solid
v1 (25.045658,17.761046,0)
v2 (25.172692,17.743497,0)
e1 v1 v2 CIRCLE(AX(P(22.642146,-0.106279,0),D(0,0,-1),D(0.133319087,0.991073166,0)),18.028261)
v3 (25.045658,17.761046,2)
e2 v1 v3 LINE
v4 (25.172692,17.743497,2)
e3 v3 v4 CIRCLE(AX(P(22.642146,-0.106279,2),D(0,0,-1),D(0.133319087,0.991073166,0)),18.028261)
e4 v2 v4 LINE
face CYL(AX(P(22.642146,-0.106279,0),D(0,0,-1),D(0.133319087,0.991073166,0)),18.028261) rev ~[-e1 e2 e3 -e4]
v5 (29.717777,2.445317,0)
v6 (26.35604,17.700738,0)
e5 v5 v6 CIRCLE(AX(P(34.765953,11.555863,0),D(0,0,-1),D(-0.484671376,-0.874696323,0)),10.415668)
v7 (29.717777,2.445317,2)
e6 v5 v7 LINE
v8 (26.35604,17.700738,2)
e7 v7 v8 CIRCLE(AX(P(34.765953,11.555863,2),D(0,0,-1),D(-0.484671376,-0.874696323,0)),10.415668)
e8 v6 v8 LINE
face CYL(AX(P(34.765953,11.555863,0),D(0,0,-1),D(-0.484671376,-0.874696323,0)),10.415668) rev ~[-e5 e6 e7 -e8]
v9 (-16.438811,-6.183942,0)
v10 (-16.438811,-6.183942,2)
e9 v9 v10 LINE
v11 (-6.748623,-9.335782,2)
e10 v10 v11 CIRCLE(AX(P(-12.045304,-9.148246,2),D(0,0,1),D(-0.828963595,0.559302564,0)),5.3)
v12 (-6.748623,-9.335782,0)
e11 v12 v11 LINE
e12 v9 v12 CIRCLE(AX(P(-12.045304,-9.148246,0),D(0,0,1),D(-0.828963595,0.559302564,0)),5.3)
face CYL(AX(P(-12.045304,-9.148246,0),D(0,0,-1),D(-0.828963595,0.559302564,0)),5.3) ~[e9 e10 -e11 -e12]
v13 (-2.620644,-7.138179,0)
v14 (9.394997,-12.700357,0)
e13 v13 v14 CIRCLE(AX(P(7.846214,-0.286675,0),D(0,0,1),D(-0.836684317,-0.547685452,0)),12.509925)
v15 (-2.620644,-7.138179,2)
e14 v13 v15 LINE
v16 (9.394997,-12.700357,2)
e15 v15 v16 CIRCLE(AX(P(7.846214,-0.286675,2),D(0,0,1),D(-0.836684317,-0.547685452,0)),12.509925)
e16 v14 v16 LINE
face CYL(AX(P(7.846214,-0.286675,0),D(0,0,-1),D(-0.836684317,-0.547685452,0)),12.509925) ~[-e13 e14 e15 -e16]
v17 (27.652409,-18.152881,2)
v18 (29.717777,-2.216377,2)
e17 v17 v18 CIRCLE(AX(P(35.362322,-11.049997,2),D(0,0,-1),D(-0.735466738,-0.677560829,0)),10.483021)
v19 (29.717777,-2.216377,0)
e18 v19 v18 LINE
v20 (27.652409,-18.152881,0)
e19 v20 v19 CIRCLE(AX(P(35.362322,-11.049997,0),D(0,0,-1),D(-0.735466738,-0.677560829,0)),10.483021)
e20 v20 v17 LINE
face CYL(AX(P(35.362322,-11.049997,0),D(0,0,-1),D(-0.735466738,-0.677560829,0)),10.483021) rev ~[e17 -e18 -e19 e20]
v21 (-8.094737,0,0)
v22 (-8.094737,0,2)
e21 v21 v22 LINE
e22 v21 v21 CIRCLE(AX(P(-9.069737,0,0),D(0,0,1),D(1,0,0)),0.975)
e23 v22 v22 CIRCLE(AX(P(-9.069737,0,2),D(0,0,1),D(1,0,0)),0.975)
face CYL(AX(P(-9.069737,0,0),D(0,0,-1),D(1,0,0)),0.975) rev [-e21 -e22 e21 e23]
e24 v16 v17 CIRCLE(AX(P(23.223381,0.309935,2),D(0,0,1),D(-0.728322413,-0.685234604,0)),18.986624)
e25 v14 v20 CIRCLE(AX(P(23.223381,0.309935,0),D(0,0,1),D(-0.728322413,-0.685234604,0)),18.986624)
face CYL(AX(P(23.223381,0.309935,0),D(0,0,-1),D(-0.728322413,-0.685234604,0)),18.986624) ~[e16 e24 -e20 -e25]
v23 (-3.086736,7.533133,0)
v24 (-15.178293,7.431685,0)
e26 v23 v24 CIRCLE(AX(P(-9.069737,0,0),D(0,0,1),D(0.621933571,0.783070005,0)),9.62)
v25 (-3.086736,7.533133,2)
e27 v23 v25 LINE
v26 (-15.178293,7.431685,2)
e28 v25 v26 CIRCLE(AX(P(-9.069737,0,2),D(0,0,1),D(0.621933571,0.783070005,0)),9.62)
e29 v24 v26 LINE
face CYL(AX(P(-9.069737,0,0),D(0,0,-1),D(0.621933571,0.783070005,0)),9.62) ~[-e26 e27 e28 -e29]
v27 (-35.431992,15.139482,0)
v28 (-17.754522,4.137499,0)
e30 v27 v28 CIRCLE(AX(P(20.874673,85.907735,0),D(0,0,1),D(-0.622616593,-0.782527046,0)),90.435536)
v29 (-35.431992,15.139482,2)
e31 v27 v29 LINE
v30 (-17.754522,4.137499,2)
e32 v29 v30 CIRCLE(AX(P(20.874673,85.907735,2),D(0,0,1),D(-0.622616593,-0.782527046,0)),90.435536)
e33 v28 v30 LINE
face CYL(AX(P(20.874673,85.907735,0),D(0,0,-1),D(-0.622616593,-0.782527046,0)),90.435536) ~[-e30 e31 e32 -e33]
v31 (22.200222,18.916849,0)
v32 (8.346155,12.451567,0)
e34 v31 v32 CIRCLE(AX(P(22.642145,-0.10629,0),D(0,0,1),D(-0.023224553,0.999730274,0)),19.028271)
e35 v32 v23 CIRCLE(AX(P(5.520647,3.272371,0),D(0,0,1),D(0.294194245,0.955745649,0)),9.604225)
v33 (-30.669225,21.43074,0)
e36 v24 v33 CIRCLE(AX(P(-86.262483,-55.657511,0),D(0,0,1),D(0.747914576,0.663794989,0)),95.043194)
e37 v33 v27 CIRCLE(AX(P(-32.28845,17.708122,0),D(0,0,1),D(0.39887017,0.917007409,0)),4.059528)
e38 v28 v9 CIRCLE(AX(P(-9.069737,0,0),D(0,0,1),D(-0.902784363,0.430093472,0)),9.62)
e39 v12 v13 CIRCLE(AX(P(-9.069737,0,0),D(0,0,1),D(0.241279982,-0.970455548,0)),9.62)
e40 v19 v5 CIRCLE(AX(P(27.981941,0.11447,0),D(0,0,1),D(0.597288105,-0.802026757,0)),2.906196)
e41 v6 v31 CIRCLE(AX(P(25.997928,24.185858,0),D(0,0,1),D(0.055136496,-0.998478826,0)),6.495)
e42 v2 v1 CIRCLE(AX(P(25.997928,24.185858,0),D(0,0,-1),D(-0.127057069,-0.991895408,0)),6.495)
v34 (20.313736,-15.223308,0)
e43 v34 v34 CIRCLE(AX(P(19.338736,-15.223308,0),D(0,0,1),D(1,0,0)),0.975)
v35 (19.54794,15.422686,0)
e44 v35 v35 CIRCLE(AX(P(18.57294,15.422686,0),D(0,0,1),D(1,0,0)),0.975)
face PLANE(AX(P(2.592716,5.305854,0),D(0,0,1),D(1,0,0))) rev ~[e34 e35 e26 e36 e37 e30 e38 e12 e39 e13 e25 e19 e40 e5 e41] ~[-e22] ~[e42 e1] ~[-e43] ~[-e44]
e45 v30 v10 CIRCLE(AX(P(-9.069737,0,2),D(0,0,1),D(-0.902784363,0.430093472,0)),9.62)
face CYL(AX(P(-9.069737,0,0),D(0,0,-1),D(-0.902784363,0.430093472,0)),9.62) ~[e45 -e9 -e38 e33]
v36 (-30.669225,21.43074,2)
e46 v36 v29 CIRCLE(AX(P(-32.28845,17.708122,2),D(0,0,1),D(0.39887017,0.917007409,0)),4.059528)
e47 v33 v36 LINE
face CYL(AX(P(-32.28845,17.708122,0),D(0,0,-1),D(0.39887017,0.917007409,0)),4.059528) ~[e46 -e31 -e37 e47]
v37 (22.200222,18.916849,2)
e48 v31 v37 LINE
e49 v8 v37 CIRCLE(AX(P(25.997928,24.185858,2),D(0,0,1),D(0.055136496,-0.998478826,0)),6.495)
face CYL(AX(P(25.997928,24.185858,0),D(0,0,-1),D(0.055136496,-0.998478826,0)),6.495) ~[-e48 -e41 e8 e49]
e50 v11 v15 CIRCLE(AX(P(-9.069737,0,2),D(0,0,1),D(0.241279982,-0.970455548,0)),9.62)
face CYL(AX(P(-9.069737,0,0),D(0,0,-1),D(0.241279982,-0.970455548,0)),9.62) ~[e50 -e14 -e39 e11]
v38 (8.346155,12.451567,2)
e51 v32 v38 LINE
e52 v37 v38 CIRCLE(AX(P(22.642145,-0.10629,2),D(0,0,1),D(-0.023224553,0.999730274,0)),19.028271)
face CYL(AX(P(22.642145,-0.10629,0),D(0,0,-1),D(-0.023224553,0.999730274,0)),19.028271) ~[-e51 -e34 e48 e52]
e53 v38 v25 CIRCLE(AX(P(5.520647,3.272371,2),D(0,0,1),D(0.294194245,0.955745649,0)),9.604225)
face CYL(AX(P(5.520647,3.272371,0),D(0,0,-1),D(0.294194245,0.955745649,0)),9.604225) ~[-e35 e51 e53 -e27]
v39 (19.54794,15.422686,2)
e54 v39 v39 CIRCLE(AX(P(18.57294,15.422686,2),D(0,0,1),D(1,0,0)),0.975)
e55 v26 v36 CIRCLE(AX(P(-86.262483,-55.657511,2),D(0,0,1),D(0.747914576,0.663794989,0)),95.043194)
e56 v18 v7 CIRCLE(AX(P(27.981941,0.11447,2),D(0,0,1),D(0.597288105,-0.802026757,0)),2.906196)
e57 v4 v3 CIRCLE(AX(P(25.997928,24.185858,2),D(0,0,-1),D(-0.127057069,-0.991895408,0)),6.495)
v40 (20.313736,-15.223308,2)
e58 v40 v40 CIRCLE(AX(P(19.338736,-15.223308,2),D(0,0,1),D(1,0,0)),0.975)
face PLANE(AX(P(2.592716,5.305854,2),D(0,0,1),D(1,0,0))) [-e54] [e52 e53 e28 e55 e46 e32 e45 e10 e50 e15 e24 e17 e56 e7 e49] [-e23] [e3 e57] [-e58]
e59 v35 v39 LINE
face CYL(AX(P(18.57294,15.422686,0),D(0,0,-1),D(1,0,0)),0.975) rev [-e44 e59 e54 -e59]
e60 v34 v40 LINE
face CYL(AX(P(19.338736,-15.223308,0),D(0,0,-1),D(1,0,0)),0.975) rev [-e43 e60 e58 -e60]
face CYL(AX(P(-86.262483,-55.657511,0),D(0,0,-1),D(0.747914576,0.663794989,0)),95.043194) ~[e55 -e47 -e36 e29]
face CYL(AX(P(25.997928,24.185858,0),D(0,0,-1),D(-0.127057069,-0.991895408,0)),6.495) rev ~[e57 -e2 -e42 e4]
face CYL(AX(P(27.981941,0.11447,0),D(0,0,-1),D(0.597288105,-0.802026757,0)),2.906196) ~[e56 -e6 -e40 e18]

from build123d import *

# Parameters (mm, degrees)
F1_R     = 0.975
F1_R_2   = 5.495
F2_DEPTH = 2


# Not quite as in the source:
# - the program builds the solid bodies; features that only make, move or delete a surface that nothing else refers to are left out


with BuildPart() as f2:
    # F1 (on Top) → F2 (new body)
    with BuildSketch(Plane.XY):
        with BuildLine():
            ThreePointArc((8.3461548541, 12.451567302), (1.7252198574, 12.0948349613), (-3.0867358283, 7.5331334509))
            ThreePointArc((-3.0867358283, 7.5331334509), (-9.1504459177, 9.6196614304), (-15.1782928372, 7.431685066))
            ThreePointArc((-15.1782928372, 7.431685066), (-22.5381757879, 14.8578874844), (-30.6692253798, 21.4307401329))
            ThreePointArc((-30.6692253798, 21.4307401329), (-35.5250947404, 20.1584087851), (-35.4319922626, 15.1394819841))
            ThreePointArc((-35.4319922626, 15.1394819841), (-26.9109452732, 9.1280444677), (-17.7545223506, 4.1374991998))
            ThreePointArc((-17.7545223506, 4.1374991998), (-18.6125164693, -1.2164521529), (-16.4388114376, -6.1839420049))
            ThreePointArc((-16.4388114376, -6.1839420049), (-13.6846503599, -14.1883393203), (-6.7486233515, -9.3357823691))
            ThreePointArc((-6.7486233515, -9.3357823691), (-4.5490625181, -8.4916373097), (-2.6206436977, -7.1381789267))
            ThreePointArc((-2.6206436977, -7.1381789267), (2.5909813664, -11.6392406956), (9.3949967995, -12.7003565431))
            ThreePointArc((9.3949967995, -12.7003565431), (17.7901975829, -17.882711986), (27.6524089277, -18.1528814137))
            ThreePointArc((27.6524089277, -18.1528814137), (24.9662444476, -9.7026669711), (29.7177772104, -2.2163768254))
            ThreePointArc((29.7177772104, -2.2163768254), (30.8881367766, 0.1144698658), (29.7177772104, 2.4453165571))
            ThreePointArc((29.7177772104, 2.4453165571), (24.594325339, 9.3144076758), (26.3560396261, 17.700737901))
            ThreePointArc((26.3560396261, 17.700737901), (27.8220537541, 30.4194435664), (22.2002219007, 18.9168491704))
            ThreePointArc((22.2002219007, 18.9168491704), (14.5953140013, 17.1367848208), (8.3461548541, 12.451567302))
        make_face()
        with BuildLine():
            Line((-17.6755707347, -0.4939858073), (-12.0034380316, -0.4939858073))
            ThreePointArc((-12.0034380316, -0.4939858073), (-10.5336675739, -2.589890275), (-7.9799964747, -2.7682288675))
            Line((-7.9799964747, -2.7682288675), (-5.2005199999, -7.702828149))
            ThreePointArc((-5.2005199999, -7.702828149), (-5.9901385216, -8.0511163546), (-6.810625891, -8.3187029026))
            ThreePointArc((-6.810625891, -8.3187029026), (-7.2968984625, -8.4404428952), (-7.7895048721, -8.5332898913))
            ThreePointArc((-7.7895048721, -8.5332898913), (-13.3753397984, -13.2373782399), (-15.1250045058, -6.1473378715))
            ThreePointArc((-15.1250045058, -6.1473378715), (-15.4687321672, -5.7824640106), (-15.7903406401, -5.3979518136))
            ThreePointArc((-15.7903406401, -5.3979518136), (-17.1156764189, -3.0930980197), (-17.6755707347, -0.4939858073))
        make_face(mode=Mode.SUBTRACT)
        with Locations((-9.069736782, 0)):
            Circle(F1_R, mode=Mode.SUBTRACT)
        with Locations((19.3387361329, -15.2233078331)):
            Circle(F1_R, mode=Mode.SUBTRACT)
        with BuildLine():
            ThreePointArc((20.3872606575, 17.7804109262), (22.7170872685, 17.9218257414), (25.0456576674, 17.7610461256))
            ThreePointArc((25.0456576674, 17.7610461256), (25.1091906486, 17.7523846185), (25.172692422, 17.7434972003))
            ThreePointArc((25.172692422, 17.7434972003), (23.684740061, 8.8128379715), (29.166954709, 1.6075621931))
            ThreePointArc((29.166954709, 1.6075621931), (29.8880875558, 0.1007714549), (29.1453733807, -1.3954994316))
            ThreePointArc((29.1453733807, -1.3954994316), (24.1127403048, -8.7463736841), (25.8509191741, -17.4837349662))
            ThreePointArc((25.8509191741, -17.4837349662), (23.5178476173, -17.6742786032), (21.1797885868, -17.5602183711))
            ThreePointArc((21.1797885868, -17.5602183711), (20.0605128424, -12.3371922115), (16.6143622853, -16.4184698048))
            ThreePointArc((16.6143622853, -16.4184698048), (12.9131993659, -14.4284100321), (9.7748074556, -11.6338723113))
            ThreePointArc((9.7748074556, -11.6338723113), (2.6662624957, -10.5651214915), (-2.4218244994, -5.4872271944))
            ThreePointArc((-2.4218244994, -5.4872271944), (-3.341520275, -6.4414234179), (-4.3966137229, -7.2433639198))
            Line((-4.3966137229, -7.2433639198), (-7.1815796443, -2.2990188393))
            ThreePointArc((-7.1815796443, -2.2990188393), (-6.094920293, 0.0330432552), (-7.2331126554, 2.3403924495))
            Line((-7.2331126554, 2.3403924495), (-4.4863168152, 7.3004562466))
            ThreePointArc((-4.4863168152, 7.3004562466), (-3.5431905745, 6.6152616741), (-2.7011412367, 5.8090783073))
            ThreePointArc((-2.7011412367, 5.8090783073), (1.7884096787, 11.0249893996), (8.6656284498, 11.2812274136))
            ThreePointArc((8.6656284498, 11.2812274136), (11.9172089396, 14.3848906615), (15.8355289242, 16.5876774731))
            ThreePointArc((15.8355289242, 16.5876774731), (19.3270471679, 12.5448488398), (20.3872606575, 17.7804109262))
        make_face(mode=Mode.SUBTRACT)
        with BuildLine():
            ThreePointArc((-16.3638620166, 4.5934885503), (-26.0025688441, 9.741867589), (-34.9414590553, 16.0273045526))
            ThreePointArc((-34.9414590553, 16.0273045526), (-34.7398034138, 19.6908643856), (-31.1758954498, 20.5631577259))
            ThreePointArc((-31.1758954498, 20.5631577259), (-22.796689347, 13.7414479433), (-15.2552633126, 6.0036373591))
            ThreePointArc((-15.2552633126, 6.0036373591), (-10.598818784, 8.4832958354), (-5.3696469446, 7.7854823354))
            Line((-5.3696469446, 7.7854823354), (-8.119843394, 2.8192778422))
            ThreePointArc((-8.119843394, 2.8192778422), (-10.5540740424, 2.5782489983), (-11.9848002521, 0.5941632478))
            Line((-11.9848002521, 0.5941632478), (-17.6692350252, 0.5941632478))
            ThreePointArc((-17.6692350252, 0.5941632478), (-17.2642756667, 2.67468362), (-16.3638620166, 4.5934885503))
        make_face(mode=Mode.SUBTRACT)
        with Locations((18.5729401514, 15.4226861541)):
            Circle(F1_R, mode=Mode.SUBTRACT)
        with Locations((25.9979280814, 24.1858578784)):
            Circle(F1_R_2, mode=Mode.SUBTRACT)
        with BuildLine():
            ThreePointArc((25.172692422, 17.7434972003), (25.1091317315, 17.7519581241), (25.0456576674, 17.7610461256))
            ThreePointArc((25.0456576674, 17.7610461256), (22.7170872685, 17.9218257414), (20.3872606575, 17.7804109262))
            ThreePointArc((20.3872606575, 17.7804109262), (19.3270471679, 12.5448488398), (15.8355289242, 16.5876774731))
            ThreePointArc((15.8355289242, 16.5876774731), (11.9172089396, 14.3848906615), (8.6656284498, 11.2812274136))
            ThreePointArc((8.6656284498, 11.2812274136), (1.7884096787, 11.0249893996), (-2.7011412367, 5.8090783073))
            ThreePointArc((-2.7011412367, 5.8090783073), (-3.5431905745, 6.6152616741), (-4.4863168152, 7.3004562466))
            Line((-4.4863168152, 7.3004562466), (-7.2331126554, 2.3403924495))
            ThreePointArc((-7.2331126554, 2.3403924495), (-6.094920293, 0.0330432552), (-7.1815796443, -2.2990188393))
            Line((-7.1815796443, -2.2990188393), (-4.3966137229, -7.2433639198))
            ThreePointArc((-4.3966137229, -7.2433639198), (-3.341520275, -6.4414234179), (-2.4218244994, -5.4872271944))
            ThreePointArc((-2.4218244994, -5.4872271944), (2.6662624957, -10.5651214915), (9.7748074556, -11.6338723113))
            ThreePointArc((9.7748074556, -11.6338723113), (12.9131993659, -14.4284100321), (16.6143622853, -16.4184698048))
            ThreePointArc((16.6143622853, -16.4184698048), (20.0605128424, -12.3371922115), (21.1797885868, -17.5602183711))
            ThreePointArc((21.1797885868, -17.5602183711), (23.5178476173, -17.6742786032), (25.8509191741, -17.4837349662))
            ThreePointArc((25.8509191741, -17.4837349662), (24.1127403048, -8.7463736841), (29.1453733807, -1.3954994316))
            ThreePointArc((29.1453733807, -1.3954994316), (29.8880875558, 0.1007714549), (29.166954709, 1.6075621931))
            ThreePointArc((29.166954709, 1.6075621931), (23.684740061, 8.8128379715), (25.172692422, 17.7434972003))
        make_face()
        with BuildLine():
            ThreePointArc((-31.1758954498, 20.5631577259), (-34.7398034138, 19.6908643856), (-34.9414590553, 16.0273045526))
            ThreePointArc((-34.9414590553, 16.0273045526), (-26.0025688441, 9.741867589), (-16.3638620166, 4.5934885503))
            ThreePointArc((-16.3638620166, 4.5934885503), (-17.2642756667, 2.67468362), (-17.6692350252, 0.5941632478))
            Line((-17.6692350252, 0.5941632478), (-11.9848002521, 0.5941632478))
            ThreePointArc((-11.9848002521, 0.5941632478), (-10.5540740424, 2.5782489983), (-8.119843394, 2.8192778422))
            Line((-8.119843394, 2.8192778422), (-5.3696469446, 7.7854823354))
            ThreePointArc((-5.3696469446, 7.7854823354), (-10.598818784, 8.4832958354), (-15.2552633126, 6.0036373591))
            ThreePointArc((-15.2552633126, 6.0036373591), (-22.796689347, 13.7414479433), (-31.1758954498, 20.5631577259))
        make_face()
        with BuildLine():
            ThreePointArc((-7.9799964747, -2.7682288675), (-10.5336675739, -2.589890275), (-12.0034380316, -0.4939858073))
            Line((-12.0034380316, -0.4939858073), (-17.6755707347, -0.4939858073))
            ThreePointArc((-17.6755707347, -0.4939858073), (-17.1156764189, -3.0930980197), (-15.7903406401, -5.3979518136))
            ThreePointArc((-15.7903406401, -5.3979518136), (-15.4687321672, -5.7824640106), (-15.1250045058, -6.1473378715))
            ThreePointArc((-15.1250045058, -6.1473378715), (-13.3753397984, -13.2373782399), (-7.7895048721, -8.5332898913))
            ThreePointArc((-7.7895048721, -8.5332898913), (-7.2968984625, -8.4404428952), (-6.810625891, -8.3187029026))
            ThreePointArc((-6.810625891, -8.3187029026), (-5.9901385216, -8.0511163546), (-5.2005199999, -7.702828149))
            Line((-5.2005199999, -7.702828149), (-7.9799964747, -2.7682288675))
        make_face()
        with Locations((25.9979280814, 24.1858578784)):
            Circle(F1_R_2)
    extrude(amount=F2_DEPTH)


solid = f2.part
